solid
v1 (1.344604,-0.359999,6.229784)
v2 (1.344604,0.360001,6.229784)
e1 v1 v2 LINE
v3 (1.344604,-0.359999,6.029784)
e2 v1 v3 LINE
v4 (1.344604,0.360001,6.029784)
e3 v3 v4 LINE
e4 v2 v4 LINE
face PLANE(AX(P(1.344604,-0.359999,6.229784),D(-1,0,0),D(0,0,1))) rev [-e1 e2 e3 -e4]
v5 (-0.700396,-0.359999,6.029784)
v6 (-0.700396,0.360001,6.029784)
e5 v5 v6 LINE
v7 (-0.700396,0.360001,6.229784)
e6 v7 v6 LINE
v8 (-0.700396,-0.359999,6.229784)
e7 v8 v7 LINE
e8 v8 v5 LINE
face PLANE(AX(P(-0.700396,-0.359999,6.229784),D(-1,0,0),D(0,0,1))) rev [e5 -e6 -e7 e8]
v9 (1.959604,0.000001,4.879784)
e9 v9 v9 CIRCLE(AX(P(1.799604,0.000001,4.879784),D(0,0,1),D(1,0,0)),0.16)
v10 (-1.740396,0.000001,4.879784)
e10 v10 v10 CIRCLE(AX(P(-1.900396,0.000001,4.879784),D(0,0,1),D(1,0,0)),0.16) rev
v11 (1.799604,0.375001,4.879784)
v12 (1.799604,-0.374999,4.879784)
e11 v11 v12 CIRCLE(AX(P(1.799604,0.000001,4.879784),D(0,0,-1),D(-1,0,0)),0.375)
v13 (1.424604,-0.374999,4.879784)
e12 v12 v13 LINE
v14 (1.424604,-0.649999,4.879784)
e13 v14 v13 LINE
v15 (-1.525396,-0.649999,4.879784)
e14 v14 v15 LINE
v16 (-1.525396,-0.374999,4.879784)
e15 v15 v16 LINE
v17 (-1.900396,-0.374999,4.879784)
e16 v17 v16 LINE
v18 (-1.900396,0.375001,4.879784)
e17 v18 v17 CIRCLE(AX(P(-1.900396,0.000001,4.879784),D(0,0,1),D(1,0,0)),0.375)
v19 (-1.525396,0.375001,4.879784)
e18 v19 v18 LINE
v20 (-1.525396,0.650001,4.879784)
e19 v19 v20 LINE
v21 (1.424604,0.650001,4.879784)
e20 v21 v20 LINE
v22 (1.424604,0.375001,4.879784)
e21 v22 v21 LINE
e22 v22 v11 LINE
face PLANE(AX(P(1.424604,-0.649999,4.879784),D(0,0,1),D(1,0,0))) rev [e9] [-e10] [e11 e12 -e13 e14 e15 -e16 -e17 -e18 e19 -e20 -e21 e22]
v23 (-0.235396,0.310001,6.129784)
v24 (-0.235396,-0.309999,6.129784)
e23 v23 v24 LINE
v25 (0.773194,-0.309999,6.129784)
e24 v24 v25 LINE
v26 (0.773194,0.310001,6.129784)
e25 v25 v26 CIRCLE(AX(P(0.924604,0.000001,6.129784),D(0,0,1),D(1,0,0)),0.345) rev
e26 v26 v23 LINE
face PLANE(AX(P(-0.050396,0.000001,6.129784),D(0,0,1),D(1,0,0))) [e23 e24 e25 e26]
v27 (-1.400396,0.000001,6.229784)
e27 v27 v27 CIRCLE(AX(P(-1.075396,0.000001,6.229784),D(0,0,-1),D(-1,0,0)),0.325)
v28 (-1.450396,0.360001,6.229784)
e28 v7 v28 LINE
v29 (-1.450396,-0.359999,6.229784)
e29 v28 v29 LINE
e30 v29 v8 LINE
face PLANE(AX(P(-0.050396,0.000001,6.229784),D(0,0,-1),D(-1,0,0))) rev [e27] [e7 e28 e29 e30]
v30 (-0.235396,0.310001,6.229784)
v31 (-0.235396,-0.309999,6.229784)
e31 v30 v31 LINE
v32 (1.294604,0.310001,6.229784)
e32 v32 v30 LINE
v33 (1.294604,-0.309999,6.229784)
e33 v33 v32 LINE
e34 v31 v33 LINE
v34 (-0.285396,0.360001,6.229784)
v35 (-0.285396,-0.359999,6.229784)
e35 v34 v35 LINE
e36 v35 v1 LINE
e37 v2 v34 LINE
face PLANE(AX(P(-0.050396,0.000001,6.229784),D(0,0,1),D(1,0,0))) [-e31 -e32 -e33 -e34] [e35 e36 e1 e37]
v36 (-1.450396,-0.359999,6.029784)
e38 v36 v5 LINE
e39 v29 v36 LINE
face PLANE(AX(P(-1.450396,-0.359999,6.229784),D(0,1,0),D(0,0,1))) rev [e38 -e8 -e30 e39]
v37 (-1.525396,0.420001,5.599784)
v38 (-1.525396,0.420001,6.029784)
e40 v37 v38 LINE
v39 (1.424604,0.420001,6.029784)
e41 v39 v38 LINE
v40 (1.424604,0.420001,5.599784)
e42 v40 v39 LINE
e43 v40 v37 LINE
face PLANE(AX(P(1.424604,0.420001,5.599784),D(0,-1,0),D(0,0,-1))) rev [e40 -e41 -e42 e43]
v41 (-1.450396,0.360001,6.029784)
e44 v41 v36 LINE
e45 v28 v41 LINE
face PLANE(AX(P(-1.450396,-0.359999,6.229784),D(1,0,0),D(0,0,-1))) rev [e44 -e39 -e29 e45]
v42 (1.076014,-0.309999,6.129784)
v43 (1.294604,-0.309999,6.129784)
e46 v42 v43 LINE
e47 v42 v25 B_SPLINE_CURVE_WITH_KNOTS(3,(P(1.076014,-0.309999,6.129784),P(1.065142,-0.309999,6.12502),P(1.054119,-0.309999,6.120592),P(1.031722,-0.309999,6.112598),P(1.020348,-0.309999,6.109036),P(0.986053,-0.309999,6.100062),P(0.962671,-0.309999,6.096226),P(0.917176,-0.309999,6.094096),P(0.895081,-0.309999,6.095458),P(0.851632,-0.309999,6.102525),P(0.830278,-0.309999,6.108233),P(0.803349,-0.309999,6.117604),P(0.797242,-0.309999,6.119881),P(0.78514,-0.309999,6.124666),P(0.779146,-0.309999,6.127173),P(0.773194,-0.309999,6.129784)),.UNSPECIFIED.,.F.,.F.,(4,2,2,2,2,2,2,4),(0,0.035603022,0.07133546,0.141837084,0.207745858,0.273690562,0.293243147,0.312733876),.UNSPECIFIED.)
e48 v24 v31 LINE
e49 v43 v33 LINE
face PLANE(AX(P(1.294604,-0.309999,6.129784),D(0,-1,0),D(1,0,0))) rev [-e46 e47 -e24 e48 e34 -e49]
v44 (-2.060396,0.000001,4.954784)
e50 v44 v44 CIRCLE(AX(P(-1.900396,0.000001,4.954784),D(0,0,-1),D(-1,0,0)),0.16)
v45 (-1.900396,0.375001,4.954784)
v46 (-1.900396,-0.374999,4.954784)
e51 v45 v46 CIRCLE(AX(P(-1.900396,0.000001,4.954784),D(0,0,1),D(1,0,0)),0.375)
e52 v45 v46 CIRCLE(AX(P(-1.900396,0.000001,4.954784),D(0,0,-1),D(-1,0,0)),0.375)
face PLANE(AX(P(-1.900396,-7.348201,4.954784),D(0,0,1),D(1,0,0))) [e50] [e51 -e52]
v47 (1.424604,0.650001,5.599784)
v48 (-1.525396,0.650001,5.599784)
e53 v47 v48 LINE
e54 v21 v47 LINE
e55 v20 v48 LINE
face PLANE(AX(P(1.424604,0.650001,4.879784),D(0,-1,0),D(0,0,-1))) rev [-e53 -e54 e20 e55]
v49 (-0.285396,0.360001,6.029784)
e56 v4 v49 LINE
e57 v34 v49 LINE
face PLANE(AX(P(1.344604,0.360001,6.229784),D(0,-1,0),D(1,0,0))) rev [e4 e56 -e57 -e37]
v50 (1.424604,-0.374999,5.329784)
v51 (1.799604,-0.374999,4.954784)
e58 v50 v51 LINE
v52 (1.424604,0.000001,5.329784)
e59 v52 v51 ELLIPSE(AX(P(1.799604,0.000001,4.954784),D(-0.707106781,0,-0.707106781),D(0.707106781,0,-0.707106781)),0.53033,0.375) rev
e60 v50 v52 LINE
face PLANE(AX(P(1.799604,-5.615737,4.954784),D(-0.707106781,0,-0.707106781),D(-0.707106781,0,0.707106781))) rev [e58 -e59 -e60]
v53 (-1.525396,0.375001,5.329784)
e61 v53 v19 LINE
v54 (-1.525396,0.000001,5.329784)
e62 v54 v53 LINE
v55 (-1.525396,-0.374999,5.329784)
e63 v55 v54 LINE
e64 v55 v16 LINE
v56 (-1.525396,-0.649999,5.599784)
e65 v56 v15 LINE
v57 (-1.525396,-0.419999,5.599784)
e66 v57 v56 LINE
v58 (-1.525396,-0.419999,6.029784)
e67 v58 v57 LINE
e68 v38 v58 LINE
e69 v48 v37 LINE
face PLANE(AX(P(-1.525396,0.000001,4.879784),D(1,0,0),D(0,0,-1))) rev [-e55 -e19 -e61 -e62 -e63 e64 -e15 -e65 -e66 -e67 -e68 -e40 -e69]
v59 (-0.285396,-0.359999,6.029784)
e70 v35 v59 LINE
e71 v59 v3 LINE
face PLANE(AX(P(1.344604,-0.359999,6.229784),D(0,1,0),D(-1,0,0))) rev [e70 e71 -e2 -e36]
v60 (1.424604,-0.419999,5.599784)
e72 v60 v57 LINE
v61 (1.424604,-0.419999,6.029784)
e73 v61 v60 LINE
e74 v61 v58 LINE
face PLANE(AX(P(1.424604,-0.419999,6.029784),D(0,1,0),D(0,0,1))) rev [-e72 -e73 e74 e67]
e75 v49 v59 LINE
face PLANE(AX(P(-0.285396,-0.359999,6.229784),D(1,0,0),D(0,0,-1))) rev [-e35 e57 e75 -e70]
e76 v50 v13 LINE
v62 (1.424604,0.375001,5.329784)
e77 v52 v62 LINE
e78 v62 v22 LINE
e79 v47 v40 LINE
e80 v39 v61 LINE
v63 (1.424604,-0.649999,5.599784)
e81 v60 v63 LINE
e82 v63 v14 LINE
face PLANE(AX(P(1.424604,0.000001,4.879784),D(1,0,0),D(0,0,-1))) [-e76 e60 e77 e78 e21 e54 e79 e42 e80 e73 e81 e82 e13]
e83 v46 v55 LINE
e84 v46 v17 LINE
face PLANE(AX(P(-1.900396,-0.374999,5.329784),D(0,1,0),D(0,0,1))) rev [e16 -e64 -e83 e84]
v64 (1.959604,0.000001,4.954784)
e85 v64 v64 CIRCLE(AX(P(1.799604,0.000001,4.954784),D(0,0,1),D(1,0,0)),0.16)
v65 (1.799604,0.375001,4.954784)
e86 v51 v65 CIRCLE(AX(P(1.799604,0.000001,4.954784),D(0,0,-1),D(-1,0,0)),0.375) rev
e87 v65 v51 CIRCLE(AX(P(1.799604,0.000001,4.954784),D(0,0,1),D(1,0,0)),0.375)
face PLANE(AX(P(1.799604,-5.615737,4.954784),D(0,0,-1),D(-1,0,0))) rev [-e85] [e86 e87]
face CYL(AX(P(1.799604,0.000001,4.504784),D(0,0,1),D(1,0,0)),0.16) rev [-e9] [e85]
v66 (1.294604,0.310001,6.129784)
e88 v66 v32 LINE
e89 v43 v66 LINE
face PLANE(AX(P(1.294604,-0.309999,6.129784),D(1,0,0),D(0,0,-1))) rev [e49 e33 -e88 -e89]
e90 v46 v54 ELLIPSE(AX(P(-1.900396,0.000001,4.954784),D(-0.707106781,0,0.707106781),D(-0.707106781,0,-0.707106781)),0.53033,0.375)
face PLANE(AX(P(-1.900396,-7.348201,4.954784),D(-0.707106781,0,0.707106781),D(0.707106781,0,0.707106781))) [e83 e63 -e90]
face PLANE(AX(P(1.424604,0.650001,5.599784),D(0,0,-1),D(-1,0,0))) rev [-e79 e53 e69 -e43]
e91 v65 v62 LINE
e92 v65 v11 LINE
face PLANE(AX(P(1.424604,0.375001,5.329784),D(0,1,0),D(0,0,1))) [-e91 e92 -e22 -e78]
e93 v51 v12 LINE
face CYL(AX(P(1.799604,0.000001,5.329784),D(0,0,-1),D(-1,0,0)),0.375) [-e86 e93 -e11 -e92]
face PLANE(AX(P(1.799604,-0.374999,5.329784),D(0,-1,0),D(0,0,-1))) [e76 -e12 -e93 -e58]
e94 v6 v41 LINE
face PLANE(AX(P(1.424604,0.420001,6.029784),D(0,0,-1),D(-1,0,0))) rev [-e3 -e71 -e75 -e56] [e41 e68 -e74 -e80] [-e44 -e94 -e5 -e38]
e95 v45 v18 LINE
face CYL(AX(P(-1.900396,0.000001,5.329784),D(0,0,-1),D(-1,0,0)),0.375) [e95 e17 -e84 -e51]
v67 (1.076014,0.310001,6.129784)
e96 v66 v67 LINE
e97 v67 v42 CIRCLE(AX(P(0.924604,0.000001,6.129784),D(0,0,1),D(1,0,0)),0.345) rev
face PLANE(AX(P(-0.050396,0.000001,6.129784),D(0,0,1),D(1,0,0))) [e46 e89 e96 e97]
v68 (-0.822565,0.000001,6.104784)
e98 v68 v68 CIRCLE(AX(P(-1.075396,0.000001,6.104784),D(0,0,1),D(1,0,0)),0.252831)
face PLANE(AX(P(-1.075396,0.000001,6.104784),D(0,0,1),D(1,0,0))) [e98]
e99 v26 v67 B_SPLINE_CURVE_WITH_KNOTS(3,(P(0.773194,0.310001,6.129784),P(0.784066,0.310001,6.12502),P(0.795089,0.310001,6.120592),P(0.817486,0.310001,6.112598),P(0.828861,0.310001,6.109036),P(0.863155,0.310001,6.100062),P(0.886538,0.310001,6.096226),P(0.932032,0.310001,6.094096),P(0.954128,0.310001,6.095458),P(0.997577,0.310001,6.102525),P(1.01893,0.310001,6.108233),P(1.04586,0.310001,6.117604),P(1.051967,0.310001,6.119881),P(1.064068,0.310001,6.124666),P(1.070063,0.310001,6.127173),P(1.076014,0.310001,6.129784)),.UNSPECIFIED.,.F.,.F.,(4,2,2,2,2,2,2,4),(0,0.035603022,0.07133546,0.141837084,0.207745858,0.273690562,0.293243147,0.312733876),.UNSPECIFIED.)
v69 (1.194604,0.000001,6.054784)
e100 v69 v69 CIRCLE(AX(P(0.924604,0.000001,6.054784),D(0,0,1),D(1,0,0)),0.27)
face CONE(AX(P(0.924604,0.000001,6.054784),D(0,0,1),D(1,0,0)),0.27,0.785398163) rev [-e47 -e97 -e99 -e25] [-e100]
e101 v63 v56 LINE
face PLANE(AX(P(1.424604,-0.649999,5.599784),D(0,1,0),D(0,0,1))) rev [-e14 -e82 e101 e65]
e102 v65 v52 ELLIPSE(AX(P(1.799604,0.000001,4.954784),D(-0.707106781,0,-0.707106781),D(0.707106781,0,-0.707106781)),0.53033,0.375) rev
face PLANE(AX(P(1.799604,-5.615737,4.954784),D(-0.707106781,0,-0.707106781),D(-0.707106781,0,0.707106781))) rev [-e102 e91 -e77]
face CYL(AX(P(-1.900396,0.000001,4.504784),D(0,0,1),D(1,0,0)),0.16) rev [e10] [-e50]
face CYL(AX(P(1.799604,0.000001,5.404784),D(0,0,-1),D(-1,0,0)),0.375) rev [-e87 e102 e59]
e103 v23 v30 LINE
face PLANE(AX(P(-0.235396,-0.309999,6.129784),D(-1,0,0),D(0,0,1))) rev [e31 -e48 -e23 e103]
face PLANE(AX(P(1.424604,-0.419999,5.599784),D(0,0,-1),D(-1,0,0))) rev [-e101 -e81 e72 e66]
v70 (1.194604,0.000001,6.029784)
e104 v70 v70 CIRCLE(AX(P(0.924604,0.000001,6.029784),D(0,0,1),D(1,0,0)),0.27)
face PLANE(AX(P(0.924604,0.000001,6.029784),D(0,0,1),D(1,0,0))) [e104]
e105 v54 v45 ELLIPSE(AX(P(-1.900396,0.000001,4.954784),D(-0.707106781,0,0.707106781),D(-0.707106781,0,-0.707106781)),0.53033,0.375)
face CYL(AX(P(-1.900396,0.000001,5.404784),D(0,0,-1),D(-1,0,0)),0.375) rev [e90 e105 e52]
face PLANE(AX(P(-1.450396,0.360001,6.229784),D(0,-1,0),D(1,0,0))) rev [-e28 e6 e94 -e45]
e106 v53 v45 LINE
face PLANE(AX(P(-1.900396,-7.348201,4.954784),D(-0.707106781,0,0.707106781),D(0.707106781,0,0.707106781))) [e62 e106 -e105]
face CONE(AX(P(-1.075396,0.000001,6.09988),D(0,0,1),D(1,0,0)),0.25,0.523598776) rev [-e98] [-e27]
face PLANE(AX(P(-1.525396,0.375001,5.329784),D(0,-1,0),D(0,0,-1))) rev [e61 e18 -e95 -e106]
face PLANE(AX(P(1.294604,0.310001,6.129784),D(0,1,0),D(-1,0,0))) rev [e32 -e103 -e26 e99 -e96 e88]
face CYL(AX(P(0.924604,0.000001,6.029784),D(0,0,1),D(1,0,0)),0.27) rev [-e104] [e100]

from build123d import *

# Parameters (mm, degrees)
BOSS_EXTRUDE5_DEPTH = 14.75
SKETCH9_W           = 7.5
SKETCH9_H           = 7.2
SKETCH9_W_2         = 16.3
BOSS_EXTRUDE6_DEPTH = 2
SKETCH10_W          = 15.3
SKETCH10_H          = 6.2
CUT_EXTRUDE4_DEPTH  = 1
SKETCH11_R          = 2.5
CUT_EXTRUDE5_DEPTH  = 1.25
BOSS_EXTRUDE7_DEPTH = 4.5
CUT_EXTRUDE7_START  = -7.5
CUT_EXTRUDE7_DEPTH  = 7.5
SKETCH18_R          = 3.75
CUT_EXTRUDE8_DEPTH  = 4.5
SKETCH19_R          = 1.6
CUT_EXTRUDE9_DEPTH  = 4.5
CHAMFER1_SIZE       = 0.75
CHAMFER1_SIZE_2     = 1.299038106
SKETCH13_R          = 2.7
CUT_EXTRUDE6_DEPTH  = 1
CHAMFER2_SIZE       = 0.75
SCALE1_SCALE        = 0.1


# Read off the part's stored shape, not the designer's step: Cut-Extrude7
with BuildPart() as part:
    # Sketch8 → Boss-Extrude5 (new, symmetric)
    with BuildSketch(Plane(origin=(0, 0, 0), x_dir=(0, 0, -1), z_dir=(1, 0, 0))):
        Polygon((0, -6.5), (0, 6.5), (-7.2, 6.5), (-7.2, 4.2), (-11.5, 4.2), (-11.5, -4.2), (-7.2, -4.2), (-7.2, -6.5), align=None)
    extrude(amount=BOSS_EXTRUDE5_DEPTH, both=True)

    # Sketch9 → Boss-Extrude6 (add)
    with BuildSketch(Plane.XY.offset(11.5)):
        with Locations((-10.25, 0)):
            Rectangle(SKETCH9_W, SKETCH9_H)
        with Locations((5.8, 0)):
            Rectangle(SKETCH9_W_2, SKETCH9_H)
    extrude(amount=BOSS_EXTRUDE6_DEPTH)

    # Sketch10 → Cut-Extrude4 (cut)
    with BuildSketch(Plane.XY.offset(13.5)):
        with Locations((5.8, 0)):
            Rectangle(SKETCH10_W, SKETCH10_H)
    extrude(amount=-CUT_EXTRUDE4_DEPTH, mode=Mode.SUBTRACT)

    # Sketch11 → Cut-Extrude5 (cut)
    with BuildSketch(Plane.XY.offset(13.5)):
        with Locations((-10.25, 0)):
            Circle(SKETCH11_R)
    extrude(amount=-CUT_EXTRUDE5_DEPTH, mode=Mode.SUBTRACT)

    # Sketch16 → Boss-Extrude7 (add)
    with BuildSketch(Plane(origin=(0, 0, 0), x_dir=(-1, 0, 0), z_dir=(0, 0, -1))):
        with BuildLine():
            Line((-14.75, -3.75), (-14.75, 3.75))
            Line((-14.75, 3.75), (-18.5, 3.75))
            ThreePointArc((-18.5, 3.75), (-22.25, 0), (-18.5, -3.75))
            Line((-18.5, -3.75), (-14.75, -3.75))
        make_face()
    boss_extrude7 = extrude(amount=-BOSS_EXTRUDE7_DEPTH)

    # Cut-Extrude7 outline → Cut-Extrude7 (cut)
    with BuildSketch(Plane.XZ.offset(3.75).offset(CUT_EXTRUDE7_START)):
        Polygon((14.75, 4.5), (18.5, 0.75), (24, 0.75), (24, 4.5), align=None)
    cut_extrude7 = extrude(amount=CUT_EXTRUDE7_DEPTH, mode=Mode.SUBTRACT)

    # Sketch18 → Cut-Extrude8 (cut)
    with BuildSketch(Plane.XY.offset(0.75)):
        with Locations((18.5, 0)):
            Circle(SKETCH18_R)
    cut_extrude8 = extrude(amount=CUT_EXTRUDE8_DEPTH, mode=Mode.SUBTRACT)

    # Sketch19 → Cut-Extrude9 (cut)
    with BuildSketch(Plane.XY.offset(0.75)):
        with Locations((18.5, 0)):
            Circle(SKETCH19_R)
    cut_extrude9 = extrude(amount=-CUT_EXTRUDE9_DEPTH, mode=Mode.SUBTRACT)

    # Mirror1: Boss-Extrude7, Cut-Extrude7, Cut-Extrude8, Cut-Extrude9 across plane
    add(boss_extrude7.mirror(Plane(origin=(0, 0, 0), x_dir=(0, 0, 1), z_dir=(1, 0, 0))))
    add(cut_extrude7.mirror(Plane(origin=(0, 0, 0), x_dir=(0, 0, 1), z_dir=(1, 0, 0))), mode=Mode.SUBTRACT)
    add(cut_extrude8.mirror(Plane(origin=(0, 0, 0), x_dir=(0, 0, 1), z_dir=(1, 0, 0))), mode=Mode.SUBTRACT)
    add(cut_extrude9.mirror(Plane(origin=(0, 0, 0), x_dir=(0, 0, 1), z_dir=(1, 0, 0))), mode=Mode.SUBTRACT)

    # Chamfer1
    # the kernel refuses this chamfer: 1.299038106, 0.75 mm, written as the material it takes off along each edge
    with BuildSketch(Plane(origin=(-10.25, 0, 13.5), x_dir=(1, 0, 0), z_dir=(0, -1, 0))) as chamfer1_piece_1_section:
        Polygon((2.5 + CHAMFER1_SIZE, 0), (2.5, -CHAMFER1_SIZE_2), (2.5, 0), align=None)
    chamfer1_piece_1 = revolve(axis=Axis((-10.25, 0, 13.5), (0, 0, 1)), mode=Mode.PRIVATE)
    chamfer1_piece_1 = split(chamfer1_piece_1, bisect_by=Plane(origin=(-13.133837987, 0, 12.25), z_dir=(0, 0, 1)), keep=Keep.TOP, mode=Mode.PRIVATE)
    add(chamfer1_piece_1, mode=Mode.SUBTRACT)

    # Sketch13 → Cut-Extrude6 (cut)
    with BuildSketch(Plane.XY.offset(12.5)):
        with Locations((9.75, 0)):
            Circle(SKETCH13_R)
    extrude(amount=-CUT_EXTRUDE6_DEPTH, mode=Mode.SUBTRACT)

    # Chamfer2
    # the kernel refuses this chamfer: 0.75 mm, written as the material it takes off along each edge
    with BuildSketch(Plane(origin=(9.75, 0, 12.5), x_dir=(1, 0, 0), z_dir=(0, -1, 0))) as chamfer2_piece_1_section:
        Polygon((2.7 + CHAMFER2_SIZE, 0), (2.7, -CHAMFER2_SIZE), (2.7, 0), align=None)
    chamfer2_piece_1 = revolve(axis=Axis((9.75, 0, 12.5), (0, 0, 1)), mode=Mode.PRIVATE)
    chamfer2_piece_1 = split(chamfer2_piece_1, bisect_by=Plane(origin=(6.68747717, -3.1, 12.13747717), z_dir=(0, 1, 0)), keep=Keep.TOP, mode=Mode.PRIVATE)
    chamfer2_piece_1 = split(chamfer2_piece_1, bisect_by=Plane(origin=(6.68747717, 3.1, 12.13747717), z_dir=(0, -1, 0)), keep=Keep.TOP, mode=Mode.PRIVATE)
    add(chamfer2_piece_1, mode=Mode.SUBTRACT)


with BuildPart() as part_1:
    # Scale1: scaled about (-0.05599767, 0, 5.421987795)
    add(part.part.scale(SCALE1_SCALE).moved(Location((-0.050397903, 0, 4.879789016))))


solid = part_1.part
